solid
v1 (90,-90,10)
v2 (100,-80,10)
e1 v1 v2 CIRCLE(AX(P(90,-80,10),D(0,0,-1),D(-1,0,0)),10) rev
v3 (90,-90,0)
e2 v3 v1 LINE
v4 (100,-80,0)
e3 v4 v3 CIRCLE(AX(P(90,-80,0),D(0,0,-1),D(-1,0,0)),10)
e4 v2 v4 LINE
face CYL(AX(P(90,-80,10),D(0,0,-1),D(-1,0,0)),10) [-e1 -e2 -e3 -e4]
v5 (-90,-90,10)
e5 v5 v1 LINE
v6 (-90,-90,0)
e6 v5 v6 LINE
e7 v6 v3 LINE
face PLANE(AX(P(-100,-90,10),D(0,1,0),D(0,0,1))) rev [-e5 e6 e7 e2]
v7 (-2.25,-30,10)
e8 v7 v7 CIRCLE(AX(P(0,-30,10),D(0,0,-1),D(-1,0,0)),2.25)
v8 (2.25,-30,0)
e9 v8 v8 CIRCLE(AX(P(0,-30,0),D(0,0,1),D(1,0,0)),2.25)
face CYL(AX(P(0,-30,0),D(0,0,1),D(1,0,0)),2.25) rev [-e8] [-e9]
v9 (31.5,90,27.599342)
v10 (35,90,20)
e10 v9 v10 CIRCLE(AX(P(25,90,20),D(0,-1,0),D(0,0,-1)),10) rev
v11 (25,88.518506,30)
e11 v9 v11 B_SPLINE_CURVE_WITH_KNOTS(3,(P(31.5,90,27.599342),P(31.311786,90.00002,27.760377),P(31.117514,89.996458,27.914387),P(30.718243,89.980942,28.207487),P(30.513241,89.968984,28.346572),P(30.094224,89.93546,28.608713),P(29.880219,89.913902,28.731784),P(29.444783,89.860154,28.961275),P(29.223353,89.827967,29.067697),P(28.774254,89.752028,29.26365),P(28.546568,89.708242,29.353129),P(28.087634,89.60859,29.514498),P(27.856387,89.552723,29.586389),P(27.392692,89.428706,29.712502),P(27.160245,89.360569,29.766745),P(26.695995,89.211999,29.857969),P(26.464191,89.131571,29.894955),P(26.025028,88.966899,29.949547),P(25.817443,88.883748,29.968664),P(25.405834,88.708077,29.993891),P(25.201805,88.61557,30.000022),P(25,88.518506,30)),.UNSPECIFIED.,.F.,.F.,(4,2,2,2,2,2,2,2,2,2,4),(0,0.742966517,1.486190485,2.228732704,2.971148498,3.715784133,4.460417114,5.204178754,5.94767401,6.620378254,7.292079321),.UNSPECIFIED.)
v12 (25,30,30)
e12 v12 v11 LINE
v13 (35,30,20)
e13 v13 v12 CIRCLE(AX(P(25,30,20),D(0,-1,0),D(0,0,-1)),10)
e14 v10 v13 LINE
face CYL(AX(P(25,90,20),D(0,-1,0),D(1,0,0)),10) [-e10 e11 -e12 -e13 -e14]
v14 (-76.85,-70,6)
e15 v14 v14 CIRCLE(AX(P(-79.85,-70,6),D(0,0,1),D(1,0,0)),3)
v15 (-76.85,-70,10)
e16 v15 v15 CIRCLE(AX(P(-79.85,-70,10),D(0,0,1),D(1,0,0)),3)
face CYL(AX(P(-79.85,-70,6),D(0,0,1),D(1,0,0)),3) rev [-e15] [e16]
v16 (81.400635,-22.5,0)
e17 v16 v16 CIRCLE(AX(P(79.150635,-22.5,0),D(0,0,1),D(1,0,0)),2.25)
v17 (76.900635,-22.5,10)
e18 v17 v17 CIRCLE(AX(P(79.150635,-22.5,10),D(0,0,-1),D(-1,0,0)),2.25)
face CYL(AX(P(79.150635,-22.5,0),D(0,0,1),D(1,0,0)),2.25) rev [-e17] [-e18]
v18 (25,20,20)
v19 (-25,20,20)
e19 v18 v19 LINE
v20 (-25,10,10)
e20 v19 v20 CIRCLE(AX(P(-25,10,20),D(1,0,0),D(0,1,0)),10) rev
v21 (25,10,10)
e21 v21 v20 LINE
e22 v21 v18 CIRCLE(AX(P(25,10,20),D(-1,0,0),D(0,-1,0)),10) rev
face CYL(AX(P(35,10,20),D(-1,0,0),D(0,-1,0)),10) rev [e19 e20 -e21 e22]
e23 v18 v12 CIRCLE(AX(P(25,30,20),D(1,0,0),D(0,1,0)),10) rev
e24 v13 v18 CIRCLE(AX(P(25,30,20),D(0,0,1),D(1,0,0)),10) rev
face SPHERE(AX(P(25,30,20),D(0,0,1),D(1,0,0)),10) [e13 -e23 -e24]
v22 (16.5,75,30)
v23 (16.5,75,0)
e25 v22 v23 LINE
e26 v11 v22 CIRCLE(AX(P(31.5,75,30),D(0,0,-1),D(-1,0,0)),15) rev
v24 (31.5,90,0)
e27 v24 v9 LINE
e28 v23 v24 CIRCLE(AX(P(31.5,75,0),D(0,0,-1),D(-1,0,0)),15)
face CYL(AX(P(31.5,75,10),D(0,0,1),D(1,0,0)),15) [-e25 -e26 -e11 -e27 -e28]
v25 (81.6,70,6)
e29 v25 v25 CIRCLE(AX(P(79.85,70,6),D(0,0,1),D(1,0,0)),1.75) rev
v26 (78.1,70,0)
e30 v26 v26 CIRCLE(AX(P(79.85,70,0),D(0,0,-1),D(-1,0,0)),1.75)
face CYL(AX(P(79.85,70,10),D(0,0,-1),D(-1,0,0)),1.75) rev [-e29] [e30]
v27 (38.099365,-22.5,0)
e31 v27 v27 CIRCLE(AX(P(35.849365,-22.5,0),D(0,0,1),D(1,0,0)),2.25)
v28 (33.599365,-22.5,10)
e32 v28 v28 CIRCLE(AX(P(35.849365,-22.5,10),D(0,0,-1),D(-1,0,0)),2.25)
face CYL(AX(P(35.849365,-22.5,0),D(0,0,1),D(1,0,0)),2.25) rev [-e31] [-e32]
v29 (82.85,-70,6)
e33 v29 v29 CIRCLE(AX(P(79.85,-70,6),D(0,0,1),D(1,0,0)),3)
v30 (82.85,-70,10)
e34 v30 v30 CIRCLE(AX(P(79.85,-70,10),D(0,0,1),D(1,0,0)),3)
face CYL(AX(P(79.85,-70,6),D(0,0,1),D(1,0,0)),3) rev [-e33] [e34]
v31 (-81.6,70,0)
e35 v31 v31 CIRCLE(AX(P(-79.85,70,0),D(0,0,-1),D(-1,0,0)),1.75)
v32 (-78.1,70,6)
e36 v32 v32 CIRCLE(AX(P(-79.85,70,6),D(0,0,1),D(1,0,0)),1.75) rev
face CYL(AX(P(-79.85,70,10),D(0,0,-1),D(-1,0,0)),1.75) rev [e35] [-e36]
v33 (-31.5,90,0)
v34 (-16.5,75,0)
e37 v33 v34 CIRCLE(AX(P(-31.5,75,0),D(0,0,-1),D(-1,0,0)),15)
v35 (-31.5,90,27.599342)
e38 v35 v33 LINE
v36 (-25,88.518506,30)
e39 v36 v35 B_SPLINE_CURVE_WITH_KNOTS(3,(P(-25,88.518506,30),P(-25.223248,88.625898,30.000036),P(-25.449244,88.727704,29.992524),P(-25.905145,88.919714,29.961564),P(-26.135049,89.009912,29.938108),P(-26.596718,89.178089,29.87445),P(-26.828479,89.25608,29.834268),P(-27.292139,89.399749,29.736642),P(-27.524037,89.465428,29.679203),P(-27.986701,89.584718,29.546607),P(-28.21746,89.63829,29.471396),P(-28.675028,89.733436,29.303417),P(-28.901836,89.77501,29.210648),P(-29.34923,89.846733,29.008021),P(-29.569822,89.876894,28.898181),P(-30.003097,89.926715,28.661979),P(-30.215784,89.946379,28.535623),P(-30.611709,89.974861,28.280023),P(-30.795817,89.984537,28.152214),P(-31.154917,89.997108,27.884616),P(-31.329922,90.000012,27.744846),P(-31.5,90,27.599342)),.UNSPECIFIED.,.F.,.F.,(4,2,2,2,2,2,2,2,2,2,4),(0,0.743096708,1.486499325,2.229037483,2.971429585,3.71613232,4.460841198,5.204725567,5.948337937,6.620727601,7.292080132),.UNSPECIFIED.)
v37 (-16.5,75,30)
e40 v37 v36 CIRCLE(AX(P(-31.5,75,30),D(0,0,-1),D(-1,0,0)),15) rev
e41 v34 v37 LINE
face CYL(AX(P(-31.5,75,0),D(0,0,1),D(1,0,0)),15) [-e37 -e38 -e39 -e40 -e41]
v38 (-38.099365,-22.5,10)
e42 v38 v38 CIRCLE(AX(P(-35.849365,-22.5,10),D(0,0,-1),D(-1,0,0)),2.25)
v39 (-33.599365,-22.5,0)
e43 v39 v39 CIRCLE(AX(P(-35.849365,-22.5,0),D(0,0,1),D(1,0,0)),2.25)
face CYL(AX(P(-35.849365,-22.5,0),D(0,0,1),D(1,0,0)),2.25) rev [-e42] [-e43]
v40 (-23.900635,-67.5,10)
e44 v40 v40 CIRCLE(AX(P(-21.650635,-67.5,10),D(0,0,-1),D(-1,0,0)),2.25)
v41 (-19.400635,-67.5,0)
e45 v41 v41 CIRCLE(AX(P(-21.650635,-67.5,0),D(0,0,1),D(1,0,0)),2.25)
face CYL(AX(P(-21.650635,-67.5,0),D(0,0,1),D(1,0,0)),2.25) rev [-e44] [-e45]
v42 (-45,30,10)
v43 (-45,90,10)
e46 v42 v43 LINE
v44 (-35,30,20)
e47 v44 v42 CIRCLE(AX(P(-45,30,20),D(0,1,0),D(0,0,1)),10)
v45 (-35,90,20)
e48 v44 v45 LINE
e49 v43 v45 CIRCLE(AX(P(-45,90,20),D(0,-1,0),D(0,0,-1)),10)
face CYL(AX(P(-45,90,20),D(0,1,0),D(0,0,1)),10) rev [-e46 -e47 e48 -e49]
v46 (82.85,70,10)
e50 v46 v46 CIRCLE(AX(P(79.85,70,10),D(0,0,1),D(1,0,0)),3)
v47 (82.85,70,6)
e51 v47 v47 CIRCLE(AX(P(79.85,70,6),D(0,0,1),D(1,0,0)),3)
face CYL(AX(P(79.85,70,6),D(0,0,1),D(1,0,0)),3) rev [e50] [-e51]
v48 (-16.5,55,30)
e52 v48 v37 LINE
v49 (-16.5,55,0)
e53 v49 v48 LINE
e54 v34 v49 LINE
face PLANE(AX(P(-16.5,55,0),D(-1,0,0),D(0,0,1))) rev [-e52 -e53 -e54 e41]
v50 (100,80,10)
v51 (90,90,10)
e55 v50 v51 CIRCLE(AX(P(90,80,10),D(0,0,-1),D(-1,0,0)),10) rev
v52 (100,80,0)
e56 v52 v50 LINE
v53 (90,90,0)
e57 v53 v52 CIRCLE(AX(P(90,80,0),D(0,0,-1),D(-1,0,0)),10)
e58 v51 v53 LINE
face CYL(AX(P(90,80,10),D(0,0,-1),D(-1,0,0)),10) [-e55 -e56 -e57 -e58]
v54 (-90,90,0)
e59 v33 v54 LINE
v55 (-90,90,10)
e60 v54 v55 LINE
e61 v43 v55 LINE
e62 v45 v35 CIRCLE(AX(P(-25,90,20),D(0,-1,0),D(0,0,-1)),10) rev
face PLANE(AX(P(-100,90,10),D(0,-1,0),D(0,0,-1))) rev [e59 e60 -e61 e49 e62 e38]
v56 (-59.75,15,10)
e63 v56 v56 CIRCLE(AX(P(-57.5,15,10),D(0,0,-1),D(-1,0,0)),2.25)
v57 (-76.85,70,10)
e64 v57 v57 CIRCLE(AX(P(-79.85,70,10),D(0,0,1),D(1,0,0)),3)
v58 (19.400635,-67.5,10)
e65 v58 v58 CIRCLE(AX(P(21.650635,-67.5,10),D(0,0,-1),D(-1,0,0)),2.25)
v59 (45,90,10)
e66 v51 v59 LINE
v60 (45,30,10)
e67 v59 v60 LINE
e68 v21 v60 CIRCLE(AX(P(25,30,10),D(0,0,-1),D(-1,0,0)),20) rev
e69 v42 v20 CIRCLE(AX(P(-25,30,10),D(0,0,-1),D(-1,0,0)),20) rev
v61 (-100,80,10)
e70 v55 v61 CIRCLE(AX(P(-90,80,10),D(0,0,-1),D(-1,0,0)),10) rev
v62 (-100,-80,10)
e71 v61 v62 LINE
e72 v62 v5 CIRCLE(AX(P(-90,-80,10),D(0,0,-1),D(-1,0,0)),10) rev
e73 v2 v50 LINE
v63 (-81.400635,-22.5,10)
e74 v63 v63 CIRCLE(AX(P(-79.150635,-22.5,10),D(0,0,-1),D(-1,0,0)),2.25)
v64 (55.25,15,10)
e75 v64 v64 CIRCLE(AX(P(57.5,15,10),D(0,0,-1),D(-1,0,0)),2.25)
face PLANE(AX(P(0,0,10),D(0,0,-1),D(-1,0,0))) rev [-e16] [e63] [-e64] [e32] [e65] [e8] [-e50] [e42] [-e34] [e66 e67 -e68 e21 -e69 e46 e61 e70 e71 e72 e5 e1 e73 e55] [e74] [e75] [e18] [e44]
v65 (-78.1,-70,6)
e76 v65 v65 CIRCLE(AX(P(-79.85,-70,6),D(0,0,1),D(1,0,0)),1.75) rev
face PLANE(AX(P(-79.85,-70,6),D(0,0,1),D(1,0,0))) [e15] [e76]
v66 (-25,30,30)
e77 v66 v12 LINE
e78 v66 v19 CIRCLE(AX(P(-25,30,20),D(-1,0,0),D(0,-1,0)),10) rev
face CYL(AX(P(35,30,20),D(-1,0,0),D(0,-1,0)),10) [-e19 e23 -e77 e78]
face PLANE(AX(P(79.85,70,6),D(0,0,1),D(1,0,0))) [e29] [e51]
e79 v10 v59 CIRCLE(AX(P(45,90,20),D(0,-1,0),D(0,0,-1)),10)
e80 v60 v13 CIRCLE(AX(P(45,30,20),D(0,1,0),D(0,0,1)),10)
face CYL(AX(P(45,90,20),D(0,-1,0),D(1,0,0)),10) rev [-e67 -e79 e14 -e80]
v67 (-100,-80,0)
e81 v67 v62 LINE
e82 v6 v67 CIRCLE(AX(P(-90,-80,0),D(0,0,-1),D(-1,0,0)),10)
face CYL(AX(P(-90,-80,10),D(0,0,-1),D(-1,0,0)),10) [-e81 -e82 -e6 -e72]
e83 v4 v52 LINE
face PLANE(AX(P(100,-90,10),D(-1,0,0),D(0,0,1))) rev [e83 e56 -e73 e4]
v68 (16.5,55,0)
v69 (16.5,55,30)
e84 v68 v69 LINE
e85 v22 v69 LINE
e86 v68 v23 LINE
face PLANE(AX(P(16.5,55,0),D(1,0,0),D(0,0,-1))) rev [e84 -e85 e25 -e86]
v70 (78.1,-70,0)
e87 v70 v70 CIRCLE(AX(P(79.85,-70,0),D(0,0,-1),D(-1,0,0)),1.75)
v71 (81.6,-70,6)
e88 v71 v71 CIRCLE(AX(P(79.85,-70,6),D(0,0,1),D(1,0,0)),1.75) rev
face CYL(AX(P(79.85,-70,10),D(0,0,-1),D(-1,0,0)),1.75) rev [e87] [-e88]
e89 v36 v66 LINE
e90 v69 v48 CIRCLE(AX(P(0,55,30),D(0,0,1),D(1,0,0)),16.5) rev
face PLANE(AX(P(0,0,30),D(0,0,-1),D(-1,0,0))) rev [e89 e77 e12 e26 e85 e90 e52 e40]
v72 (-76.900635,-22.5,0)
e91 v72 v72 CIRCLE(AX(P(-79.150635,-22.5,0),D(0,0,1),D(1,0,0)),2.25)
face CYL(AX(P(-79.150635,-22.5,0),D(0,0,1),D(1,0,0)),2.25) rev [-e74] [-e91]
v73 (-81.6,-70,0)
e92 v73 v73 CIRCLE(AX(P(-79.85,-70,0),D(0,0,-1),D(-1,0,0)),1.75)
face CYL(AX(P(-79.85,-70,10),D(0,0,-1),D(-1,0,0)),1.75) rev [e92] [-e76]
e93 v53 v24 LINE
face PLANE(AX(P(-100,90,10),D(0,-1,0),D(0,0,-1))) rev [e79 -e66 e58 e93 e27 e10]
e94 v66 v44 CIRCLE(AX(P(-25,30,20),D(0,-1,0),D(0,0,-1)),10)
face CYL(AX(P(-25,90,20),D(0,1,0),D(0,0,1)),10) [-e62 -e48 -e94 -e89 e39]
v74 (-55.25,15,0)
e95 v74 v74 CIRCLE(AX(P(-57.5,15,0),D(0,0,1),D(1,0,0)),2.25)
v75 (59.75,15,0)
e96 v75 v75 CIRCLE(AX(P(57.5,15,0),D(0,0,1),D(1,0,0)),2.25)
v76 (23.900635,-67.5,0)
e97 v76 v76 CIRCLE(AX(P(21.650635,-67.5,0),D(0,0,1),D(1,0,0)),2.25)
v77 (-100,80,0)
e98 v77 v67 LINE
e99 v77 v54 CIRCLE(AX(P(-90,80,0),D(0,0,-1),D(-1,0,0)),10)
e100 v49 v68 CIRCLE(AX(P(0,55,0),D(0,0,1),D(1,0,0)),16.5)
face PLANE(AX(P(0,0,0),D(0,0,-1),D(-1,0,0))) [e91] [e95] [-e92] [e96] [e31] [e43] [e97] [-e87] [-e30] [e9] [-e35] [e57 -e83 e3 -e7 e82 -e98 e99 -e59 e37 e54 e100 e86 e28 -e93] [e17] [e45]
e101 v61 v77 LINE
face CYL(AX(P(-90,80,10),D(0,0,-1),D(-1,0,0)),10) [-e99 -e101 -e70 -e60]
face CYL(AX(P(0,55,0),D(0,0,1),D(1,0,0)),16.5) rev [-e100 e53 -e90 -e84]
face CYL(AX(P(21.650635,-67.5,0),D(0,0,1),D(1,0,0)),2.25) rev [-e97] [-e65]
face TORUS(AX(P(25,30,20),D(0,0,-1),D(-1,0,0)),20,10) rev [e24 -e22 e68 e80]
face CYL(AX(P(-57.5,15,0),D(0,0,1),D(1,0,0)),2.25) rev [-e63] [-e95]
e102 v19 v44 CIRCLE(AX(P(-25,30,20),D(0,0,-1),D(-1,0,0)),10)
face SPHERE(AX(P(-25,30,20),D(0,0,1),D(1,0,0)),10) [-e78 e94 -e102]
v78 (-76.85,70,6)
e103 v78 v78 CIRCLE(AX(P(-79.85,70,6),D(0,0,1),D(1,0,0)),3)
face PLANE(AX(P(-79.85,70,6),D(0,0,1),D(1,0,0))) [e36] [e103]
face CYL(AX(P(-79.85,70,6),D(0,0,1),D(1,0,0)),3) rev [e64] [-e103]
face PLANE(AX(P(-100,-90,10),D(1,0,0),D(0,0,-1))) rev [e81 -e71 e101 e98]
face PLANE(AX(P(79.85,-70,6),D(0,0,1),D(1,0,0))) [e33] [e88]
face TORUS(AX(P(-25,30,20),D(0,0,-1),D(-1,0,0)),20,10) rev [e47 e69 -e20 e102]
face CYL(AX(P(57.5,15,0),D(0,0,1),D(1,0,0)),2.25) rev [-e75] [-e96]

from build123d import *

# Parameters (mm, degrees)
SKETCH1_W               = 200
SKETCH1_H               = 180
BOSS_EXTRUDE1_DEPTH     = 10
FILLET1_R               = 10
CUT_EXTRUDE5_DEPTH      = 135.907375632
CUT_EXTRUDE5_DEPTH_BACK = 135.907375632
SKETCH26_R              = 1.75
SKETCH27_R              = 3
CUT_EXTRUDE6_DEPTH      = 4
SKETCH28_W              = 70
SKETCH28_H              = 70
BOSS_EXTRUDE2_DEPTH     = 20
CUT_EXTRUDE8_DEPTH      = 138.840487521
CUT_EXTRUDE8_DEPTH_BACK = 138.840487521
FILLET3_R               = 10
FILLET4_R               = 15
CUT_EXTRUDE9_DEPTH      = 137.014705168
CUT_EXTRUDE9_DEPTH_BACK = 137.014705168
SKETCH30_R              = 2.25


with BuildPart() as part:
    # Sketch1 → Boss-Extrude1 (new body)
    with BuildSketch(Plane.XY):
        Rectangle(SKETCH1_W, SKETCH1_H)
    extrude(amount=BOSS_EXTRUDE1_DEPTH)

    # Fillet1
    fillet1_edges = [part.edges().sort_by_distance(p)[0] for p in [
        (100, -90, 5),
        (-100, -90, 5),
        (-100, 90, 5),
        (100, 90, 5),
    ]]
    fillet(fillet1_edges, radius=FILLET1_R)

    # Sketch26 → Cut-Extrude5 (cut, two sides: drawn at the far end of the back side and taken through both)
    with BuildSketch(Plane(origin=(0, 0, 0), x_dir=(-1, 0, 0), z_dir=(0, 0, -1)).offset(-CUT_EXTRUDE5_DEPTH_BACK)):
        with Locations((-79.85, 70)):
            Circle(SKETCH26_R)
        with Locations((-79.85, -70)):
            Circle(SKETCH26_R)
        with Locations((79.85, -70)):
            Circle(SKETCH26_R)
        with Locations((79.85, 70)):
            Circle(SKETCH26_R)
    extrude(amount=CUT_EXTRUDE5_DEPTH + CUT_EXTRUDE5_DEPTH_BACK, mode=Mode.SUBTRACT)

    # Sketch27 → Cut-Extrude6 (cut)
    with BuildSketch(Plane.XY.offset(10)):
        with Locations((-79.85, 70)):
            Circle(SKETCH27_R)
        with Locations((79.85, 70)):
            Circle(SKETCH27_R)
        with Locations((79.85, -70)):
            Circle(SKETCH27_R)
        with Locations((-79.85, -70)):
            Circle(SKETCH27_R)
    extrude(amount=-CUT_EXTRUDE6_DEPTH, mode=Mode.SUBTRACT)

    # Sketch28 → Boss-Extrude2 (add)
    with BuildSketch(Plane.XY.offset(10)):
        with Locations((0, 55)):
            Rectangle(SKETCH28_W, SKETCH28_H)
    extrude(amount=BOSS_EXTRUDE2_DEPTH)

    # Sketch29 → Cut-Extrude8 (cut, two sides: drawn at the far end of the back side and taken through both)
    with BuildSketch(Plane.XY.offset(30).offset(-CUT_EXTRUDE8_DEPTH_BACK)):
        with BuildLine():
            Line((-16.5, 55), (-16.5, 90))
            Line((-16.5, 90), (16.5, 90))
            Line((16.5, 90), (16.5, 55))
            ThreePointArc((16.5, 55), (0, 38.5), (-16.5, 55))
        make_face()
    extrude(amount=CUT_EXTRUDE8_DEPTH + CUT_EXTRUDE8_DEPTH_BACK, mode=Mode.SUBTRACT)

    # Fillet3
    fillet3_edges = [part.edges().sort_by_distance(p)[0] for p in [
        (0, 20, 30),
        (-35, 20, 20),
        (0, 20, 10),
        (-35, 55, 30),
        (-35, 55, 10),
        (35, 55, 30),
        (35, 20, 20),
        (35, 55, 10),
    ]]
    fillet(fillet3_edges, radius=FILLET3_R - 0.0001)  # a hair under: the kernel refuses the full size

    # Fillet4
    fillet4_edges = [part.edges().sort_by_distance(p)[0] for p in [
        (16.5, 90, 15),
        (-16.5, 90, 15),
    ]]
    fillet(fillet4_edges, radius=FILLET4_R)

    # Sketch30 → Cut-Extrude9 (cut, two sides: drawn at the far end of the back side and taken through both)
    with BuildSketch(Plane.XY.offset(10).offset(-CUT_EXTRUDE9_DEPTH_BACK)):
        with Locations((-21.650635095, -67.5)):
            Circle(SKETCH30_R)
        with Locations((21.650635095, -67.5)):
            Circle(SKETCH30_R)
        with Locations((0, -30)):
            Circle(SKETCH30_R)
        with Locations((-79.150635095, -22.5)):
            Circle(SKETCH30_R)
        with Locations((-35.849364905, -22.5)):
            Circle(SKETCH30_R)
        with Locations((-57.5, 15)):
            Circle(SKETCH30_R)
        with Locations((35.849364905, -22.5)):
            Circle(SKETCH30_R)
        with Locations((79.150635095, -22.5)):
            Circle(SKETCH30_R)
        with Locations((57.5, 15)):
            Circle(SKETCH30_R)
    extrude(amount=CUT_EXTRUDE9_DEPTH + CUT_EXTRUDE9_DEPTH_BACK, mode=Mode.SUBTRACT)


solid = part.part
